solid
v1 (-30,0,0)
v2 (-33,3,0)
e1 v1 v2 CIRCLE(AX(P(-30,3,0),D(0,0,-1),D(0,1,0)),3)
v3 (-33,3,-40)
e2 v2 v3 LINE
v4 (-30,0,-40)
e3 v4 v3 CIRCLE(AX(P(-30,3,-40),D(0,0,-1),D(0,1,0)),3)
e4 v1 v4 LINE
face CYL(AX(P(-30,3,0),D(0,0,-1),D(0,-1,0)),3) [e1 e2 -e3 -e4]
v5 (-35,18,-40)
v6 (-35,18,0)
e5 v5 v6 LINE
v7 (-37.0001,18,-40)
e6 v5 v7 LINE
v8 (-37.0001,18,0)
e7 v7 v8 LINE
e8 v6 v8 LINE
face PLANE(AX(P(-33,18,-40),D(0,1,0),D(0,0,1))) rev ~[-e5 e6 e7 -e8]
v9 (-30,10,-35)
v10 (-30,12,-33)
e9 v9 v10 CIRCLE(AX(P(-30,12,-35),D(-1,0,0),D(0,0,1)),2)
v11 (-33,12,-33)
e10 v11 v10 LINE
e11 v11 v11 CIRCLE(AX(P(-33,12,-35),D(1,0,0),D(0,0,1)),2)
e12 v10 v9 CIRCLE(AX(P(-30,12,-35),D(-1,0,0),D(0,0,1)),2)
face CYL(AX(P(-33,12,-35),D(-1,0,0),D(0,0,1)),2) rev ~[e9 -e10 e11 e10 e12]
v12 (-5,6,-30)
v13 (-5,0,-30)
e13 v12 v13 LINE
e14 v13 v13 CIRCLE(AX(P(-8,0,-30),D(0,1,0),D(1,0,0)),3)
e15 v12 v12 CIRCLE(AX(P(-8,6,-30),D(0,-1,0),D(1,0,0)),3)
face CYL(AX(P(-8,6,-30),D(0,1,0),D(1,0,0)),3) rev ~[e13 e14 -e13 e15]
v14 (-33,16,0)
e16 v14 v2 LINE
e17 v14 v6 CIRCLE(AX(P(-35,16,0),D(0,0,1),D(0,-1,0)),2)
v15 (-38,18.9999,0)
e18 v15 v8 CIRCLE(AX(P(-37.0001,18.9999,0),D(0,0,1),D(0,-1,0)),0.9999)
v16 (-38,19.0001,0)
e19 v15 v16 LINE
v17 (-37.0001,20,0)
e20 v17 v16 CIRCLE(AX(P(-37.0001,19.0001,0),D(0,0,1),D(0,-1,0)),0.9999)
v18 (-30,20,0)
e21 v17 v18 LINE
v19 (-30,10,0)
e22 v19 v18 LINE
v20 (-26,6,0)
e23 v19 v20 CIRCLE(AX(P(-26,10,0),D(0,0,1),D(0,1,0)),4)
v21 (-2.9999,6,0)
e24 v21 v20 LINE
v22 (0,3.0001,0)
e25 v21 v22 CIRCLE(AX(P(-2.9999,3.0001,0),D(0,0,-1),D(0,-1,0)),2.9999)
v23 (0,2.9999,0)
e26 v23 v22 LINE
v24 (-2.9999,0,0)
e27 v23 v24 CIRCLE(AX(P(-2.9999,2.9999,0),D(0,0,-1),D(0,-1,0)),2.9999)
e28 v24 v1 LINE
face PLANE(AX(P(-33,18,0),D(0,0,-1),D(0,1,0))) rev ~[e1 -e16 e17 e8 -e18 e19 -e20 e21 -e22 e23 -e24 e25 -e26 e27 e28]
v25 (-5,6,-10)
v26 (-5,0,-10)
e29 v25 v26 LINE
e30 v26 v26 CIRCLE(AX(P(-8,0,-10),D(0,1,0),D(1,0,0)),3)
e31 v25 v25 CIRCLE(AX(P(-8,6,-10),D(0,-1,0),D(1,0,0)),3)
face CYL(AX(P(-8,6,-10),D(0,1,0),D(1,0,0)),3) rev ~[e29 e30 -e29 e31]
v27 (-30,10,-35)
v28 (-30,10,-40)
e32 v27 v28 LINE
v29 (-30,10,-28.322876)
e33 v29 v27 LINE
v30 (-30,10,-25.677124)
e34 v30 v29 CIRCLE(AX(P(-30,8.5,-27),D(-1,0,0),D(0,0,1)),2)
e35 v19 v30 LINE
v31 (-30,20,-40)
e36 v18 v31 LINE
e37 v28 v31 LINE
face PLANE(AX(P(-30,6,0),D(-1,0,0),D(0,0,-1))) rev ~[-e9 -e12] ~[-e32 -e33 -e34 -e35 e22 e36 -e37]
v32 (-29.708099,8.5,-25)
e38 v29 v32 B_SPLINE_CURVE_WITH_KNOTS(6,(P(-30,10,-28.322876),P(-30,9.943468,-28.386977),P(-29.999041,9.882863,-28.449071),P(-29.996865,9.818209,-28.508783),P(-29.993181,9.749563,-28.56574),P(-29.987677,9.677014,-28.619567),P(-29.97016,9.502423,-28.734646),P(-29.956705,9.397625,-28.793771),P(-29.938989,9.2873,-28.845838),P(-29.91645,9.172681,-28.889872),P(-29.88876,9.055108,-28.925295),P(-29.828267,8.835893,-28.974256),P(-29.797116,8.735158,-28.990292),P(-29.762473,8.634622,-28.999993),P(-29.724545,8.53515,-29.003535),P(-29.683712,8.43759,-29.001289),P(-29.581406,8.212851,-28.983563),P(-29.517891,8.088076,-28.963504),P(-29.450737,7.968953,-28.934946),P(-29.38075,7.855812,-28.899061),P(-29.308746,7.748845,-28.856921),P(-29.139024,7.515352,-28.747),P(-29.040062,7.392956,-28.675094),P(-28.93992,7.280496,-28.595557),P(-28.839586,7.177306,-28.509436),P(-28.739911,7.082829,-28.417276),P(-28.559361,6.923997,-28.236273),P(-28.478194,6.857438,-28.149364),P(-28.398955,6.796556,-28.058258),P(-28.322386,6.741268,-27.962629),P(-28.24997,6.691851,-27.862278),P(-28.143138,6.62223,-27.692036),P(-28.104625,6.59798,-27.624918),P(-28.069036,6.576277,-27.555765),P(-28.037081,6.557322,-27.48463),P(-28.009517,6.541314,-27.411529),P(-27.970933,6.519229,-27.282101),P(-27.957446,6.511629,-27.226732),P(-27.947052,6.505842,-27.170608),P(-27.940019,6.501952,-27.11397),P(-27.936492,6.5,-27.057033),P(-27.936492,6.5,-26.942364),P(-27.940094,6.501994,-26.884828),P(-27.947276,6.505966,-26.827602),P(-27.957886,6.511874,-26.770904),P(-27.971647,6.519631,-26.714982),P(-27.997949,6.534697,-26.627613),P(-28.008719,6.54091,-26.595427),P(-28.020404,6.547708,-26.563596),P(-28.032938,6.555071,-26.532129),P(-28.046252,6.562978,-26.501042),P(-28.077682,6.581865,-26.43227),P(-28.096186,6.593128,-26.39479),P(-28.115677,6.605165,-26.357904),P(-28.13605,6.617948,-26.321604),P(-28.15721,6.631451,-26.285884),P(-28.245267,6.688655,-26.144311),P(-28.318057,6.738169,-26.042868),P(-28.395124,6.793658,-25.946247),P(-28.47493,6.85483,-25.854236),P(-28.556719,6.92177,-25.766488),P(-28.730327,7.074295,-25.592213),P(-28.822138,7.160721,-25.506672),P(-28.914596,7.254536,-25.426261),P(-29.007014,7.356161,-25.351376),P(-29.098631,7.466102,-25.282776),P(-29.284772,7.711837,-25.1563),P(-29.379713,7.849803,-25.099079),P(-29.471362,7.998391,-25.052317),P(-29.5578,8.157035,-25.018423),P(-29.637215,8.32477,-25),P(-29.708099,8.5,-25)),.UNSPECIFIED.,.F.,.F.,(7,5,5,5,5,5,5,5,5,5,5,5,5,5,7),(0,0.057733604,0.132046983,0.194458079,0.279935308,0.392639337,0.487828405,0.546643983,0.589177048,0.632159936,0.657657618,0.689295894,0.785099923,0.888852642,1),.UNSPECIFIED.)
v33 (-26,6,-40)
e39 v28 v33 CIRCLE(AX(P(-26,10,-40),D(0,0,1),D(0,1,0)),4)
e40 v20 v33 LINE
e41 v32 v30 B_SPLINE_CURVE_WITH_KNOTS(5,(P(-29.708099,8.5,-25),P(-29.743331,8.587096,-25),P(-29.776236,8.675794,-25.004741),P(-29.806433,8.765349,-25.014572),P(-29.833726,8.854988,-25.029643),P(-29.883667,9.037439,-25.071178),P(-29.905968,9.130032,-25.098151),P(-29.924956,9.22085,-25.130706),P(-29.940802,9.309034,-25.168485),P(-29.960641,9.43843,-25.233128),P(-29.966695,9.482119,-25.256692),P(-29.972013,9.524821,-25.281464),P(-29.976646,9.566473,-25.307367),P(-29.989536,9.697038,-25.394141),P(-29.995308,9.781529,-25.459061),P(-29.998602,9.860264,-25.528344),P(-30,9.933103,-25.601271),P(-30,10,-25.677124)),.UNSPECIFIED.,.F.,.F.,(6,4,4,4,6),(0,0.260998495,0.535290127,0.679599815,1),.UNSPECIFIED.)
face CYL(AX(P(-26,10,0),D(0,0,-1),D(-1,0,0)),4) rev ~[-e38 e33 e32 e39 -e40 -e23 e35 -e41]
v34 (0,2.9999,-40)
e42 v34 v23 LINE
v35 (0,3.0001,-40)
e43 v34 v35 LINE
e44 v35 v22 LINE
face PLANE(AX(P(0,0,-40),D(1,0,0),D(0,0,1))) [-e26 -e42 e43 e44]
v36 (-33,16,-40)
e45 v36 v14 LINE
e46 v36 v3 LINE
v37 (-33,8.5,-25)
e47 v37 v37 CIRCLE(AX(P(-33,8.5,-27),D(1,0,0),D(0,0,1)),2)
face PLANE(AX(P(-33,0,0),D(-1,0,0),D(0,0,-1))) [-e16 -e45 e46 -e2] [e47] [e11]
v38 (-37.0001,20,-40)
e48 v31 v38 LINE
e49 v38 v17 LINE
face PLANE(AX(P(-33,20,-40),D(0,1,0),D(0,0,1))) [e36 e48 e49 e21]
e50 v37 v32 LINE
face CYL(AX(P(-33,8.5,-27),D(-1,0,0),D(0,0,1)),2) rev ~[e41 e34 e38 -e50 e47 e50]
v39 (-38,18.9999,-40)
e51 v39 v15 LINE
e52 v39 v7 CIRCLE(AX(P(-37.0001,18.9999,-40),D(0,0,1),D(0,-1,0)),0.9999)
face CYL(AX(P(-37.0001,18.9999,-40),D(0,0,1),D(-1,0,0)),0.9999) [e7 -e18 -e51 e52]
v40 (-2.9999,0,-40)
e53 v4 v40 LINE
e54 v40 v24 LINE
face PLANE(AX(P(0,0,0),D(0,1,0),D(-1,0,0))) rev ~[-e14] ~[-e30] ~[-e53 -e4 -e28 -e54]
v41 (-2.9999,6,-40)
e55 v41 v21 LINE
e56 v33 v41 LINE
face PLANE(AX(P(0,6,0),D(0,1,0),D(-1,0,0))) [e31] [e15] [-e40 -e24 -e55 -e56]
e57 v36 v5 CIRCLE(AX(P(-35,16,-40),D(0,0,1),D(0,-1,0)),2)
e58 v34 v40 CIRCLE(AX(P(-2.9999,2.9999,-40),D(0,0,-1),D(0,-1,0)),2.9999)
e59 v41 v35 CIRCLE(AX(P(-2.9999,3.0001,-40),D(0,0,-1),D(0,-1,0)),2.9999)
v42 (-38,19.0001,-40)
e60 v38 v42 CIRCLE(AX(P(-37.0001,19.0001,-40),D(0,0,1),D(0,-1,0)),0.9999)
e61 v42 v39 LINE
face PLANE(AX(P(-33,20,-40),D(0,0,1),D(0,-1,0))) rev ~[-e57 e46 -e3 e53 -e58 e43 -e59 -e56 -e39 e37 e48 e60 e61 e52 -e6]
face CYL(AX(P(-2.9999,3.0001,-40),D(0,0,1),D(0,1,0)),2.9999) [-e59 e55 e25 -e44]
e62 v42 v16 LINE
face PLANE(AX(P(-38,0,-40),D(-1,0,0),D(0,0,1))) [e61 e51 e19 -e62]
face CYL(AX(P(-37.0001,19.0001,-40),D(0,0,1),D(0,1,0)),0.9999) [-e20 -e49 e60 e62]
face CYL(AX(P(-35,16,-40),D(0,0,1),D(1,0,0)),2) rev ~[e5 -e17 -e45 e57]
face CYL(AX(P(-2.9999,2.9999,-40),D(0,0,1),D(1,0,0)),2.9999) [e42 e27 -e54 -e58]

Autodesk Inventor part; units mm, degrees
ref_plane "YZ Plane" through (0, 0, 0) normal (1, 0, 0) x (0, 1, 0)
ref_plane "XZ Plane" through (0, 0, 0) normal (0, 1, 0) x (-1, 0, 0)
ref_plane "XY Plane" through (0, 0, 0) normal (0, 0, 1) x (1, 0, 0)
sketch "Sketch1" plane through (0, 0, 0) normal (0, 1, 0) x (-1, 0, 0)
  line L0 (0, 0) -> (33, 0)
  line L1 (33, 0) -> (33, -40)
  line L2 (33, -40) -> (0, -40)
  line L3 (0, -40) -> (0, 0)
  dimension "d0" = 33
  dimension "d1" = 40
extrude "Extrusion1" add sketch "Sketch1" along normal blind 6
sketch "Sketch2" plane through (0, 6, 0) normal (0, 1, 0) x (1, 0, 0)
  line L0 (-33, 0) -> (0, 0) projected
  line L1 (0, 40) -> (-33, 40) projected
  line L2 (-33, 0) -> (-30, 0)
  line L3 (-30, 0) -> (-30, 40)
  line L4 (-30, 40) -> (-33, 40)
  line L5 (-33, 40) -> (-33, 0)
  dimension "d4" = 3
extrude "Extrusion2" add sketch "Sketch2" along normal blind 14
sketch "Sketch3" plane through (-33, 0, -40) normal (-1, 0, 0) x (0, 0, 1)
  line L0 (0, 20) -> (40, 20) projected
  line L1 (40, 20) -> (0, 20)
  line L2 (0, 20) -> (0, 18)
  line L3 (0, 18) -> (40, 18)
  line L4 (40, 18) -> (40, 20)
  point P0 (40, 0)
  point P1 (0, 20)
  dimension "d7" = 40
  dimension "d8" = 2
extrude "Extrusion3" add sketch "Sketch3" along normal blind 5
fillet "Fillet1" radius 1 2 edges at (-38, 20, -20) (-38, 18, -20)
fillet "Fillet2" radius 4 1 edges at (-30, 6, -20)
fillet "Fillet3" radius 3 2 edges at (0, 6, -20) (0, 0, -20)
fillet "Fillet4" radius 3 1 edges at (-33, 0, -20)
sketch "Sketch4" plane through (0, 6, 0) normal (0, 1, 0) x (1, 0, 0)
  line L0 (-8, 0) -> (-8, 10)
  line L1 (-3, 40) -> (-30, 40) projected
  circle A0 centre (-8, 10) radius 3
  line L2 (-8, 40) -> (-8, 30)
  line L3 (-8, 40) -> (2, 40) construction
  circle A1 centre (-8, 30) radius 3
  point P0 (0, 0)
  dimension "d15" = 10
  dimension "d16" = 6
  dimension "d17" = 10
  dimension "d18" = 90
  dimension "d19" = 5
  dimension "d20" = 6
  dimension "d23" = 5
extrude "Extrusion4" cut sketch "Sketch4" against normal through all
fillet "Fillet5" radius 2 1 edges at (-33, 18, -20)
sketch "Sketch5" plane through (-33, 3, -40) normal (-1, 0, 0) x (0, 0, 1)
  line L0 (0, 5.5) -> (5, 5.5)
  line L1 (5, 5.5) -> (5, 9)
  line L2 (5, 5.5) -> (8.5, 5.5) construction
  line L3 (5, 5.5) -> (13, 5.5)
  circle A0 centre (5, 9) radius 2
  circle A1 centre (13, 5.5) radius 2
  line L4 (40, 0) -> (0, 0) projected
  line L5 (0, 7) -> (0, 17) projected
  line L6 (0, -3) -> (40, -3) projected
  dimension "d25" = 5
  dimension "d28" = 3.5
  dimension "d29" = 90
  dimension "d30" = 8
  dimension "d32" = 4
  dimension "d33" = 4
  dimension "d38" = 8.5
extrude "Extrusion5" cut sketch "Sketch5" against normal through all both and the other way through all
properties part number "Cable_Guide_Support"
